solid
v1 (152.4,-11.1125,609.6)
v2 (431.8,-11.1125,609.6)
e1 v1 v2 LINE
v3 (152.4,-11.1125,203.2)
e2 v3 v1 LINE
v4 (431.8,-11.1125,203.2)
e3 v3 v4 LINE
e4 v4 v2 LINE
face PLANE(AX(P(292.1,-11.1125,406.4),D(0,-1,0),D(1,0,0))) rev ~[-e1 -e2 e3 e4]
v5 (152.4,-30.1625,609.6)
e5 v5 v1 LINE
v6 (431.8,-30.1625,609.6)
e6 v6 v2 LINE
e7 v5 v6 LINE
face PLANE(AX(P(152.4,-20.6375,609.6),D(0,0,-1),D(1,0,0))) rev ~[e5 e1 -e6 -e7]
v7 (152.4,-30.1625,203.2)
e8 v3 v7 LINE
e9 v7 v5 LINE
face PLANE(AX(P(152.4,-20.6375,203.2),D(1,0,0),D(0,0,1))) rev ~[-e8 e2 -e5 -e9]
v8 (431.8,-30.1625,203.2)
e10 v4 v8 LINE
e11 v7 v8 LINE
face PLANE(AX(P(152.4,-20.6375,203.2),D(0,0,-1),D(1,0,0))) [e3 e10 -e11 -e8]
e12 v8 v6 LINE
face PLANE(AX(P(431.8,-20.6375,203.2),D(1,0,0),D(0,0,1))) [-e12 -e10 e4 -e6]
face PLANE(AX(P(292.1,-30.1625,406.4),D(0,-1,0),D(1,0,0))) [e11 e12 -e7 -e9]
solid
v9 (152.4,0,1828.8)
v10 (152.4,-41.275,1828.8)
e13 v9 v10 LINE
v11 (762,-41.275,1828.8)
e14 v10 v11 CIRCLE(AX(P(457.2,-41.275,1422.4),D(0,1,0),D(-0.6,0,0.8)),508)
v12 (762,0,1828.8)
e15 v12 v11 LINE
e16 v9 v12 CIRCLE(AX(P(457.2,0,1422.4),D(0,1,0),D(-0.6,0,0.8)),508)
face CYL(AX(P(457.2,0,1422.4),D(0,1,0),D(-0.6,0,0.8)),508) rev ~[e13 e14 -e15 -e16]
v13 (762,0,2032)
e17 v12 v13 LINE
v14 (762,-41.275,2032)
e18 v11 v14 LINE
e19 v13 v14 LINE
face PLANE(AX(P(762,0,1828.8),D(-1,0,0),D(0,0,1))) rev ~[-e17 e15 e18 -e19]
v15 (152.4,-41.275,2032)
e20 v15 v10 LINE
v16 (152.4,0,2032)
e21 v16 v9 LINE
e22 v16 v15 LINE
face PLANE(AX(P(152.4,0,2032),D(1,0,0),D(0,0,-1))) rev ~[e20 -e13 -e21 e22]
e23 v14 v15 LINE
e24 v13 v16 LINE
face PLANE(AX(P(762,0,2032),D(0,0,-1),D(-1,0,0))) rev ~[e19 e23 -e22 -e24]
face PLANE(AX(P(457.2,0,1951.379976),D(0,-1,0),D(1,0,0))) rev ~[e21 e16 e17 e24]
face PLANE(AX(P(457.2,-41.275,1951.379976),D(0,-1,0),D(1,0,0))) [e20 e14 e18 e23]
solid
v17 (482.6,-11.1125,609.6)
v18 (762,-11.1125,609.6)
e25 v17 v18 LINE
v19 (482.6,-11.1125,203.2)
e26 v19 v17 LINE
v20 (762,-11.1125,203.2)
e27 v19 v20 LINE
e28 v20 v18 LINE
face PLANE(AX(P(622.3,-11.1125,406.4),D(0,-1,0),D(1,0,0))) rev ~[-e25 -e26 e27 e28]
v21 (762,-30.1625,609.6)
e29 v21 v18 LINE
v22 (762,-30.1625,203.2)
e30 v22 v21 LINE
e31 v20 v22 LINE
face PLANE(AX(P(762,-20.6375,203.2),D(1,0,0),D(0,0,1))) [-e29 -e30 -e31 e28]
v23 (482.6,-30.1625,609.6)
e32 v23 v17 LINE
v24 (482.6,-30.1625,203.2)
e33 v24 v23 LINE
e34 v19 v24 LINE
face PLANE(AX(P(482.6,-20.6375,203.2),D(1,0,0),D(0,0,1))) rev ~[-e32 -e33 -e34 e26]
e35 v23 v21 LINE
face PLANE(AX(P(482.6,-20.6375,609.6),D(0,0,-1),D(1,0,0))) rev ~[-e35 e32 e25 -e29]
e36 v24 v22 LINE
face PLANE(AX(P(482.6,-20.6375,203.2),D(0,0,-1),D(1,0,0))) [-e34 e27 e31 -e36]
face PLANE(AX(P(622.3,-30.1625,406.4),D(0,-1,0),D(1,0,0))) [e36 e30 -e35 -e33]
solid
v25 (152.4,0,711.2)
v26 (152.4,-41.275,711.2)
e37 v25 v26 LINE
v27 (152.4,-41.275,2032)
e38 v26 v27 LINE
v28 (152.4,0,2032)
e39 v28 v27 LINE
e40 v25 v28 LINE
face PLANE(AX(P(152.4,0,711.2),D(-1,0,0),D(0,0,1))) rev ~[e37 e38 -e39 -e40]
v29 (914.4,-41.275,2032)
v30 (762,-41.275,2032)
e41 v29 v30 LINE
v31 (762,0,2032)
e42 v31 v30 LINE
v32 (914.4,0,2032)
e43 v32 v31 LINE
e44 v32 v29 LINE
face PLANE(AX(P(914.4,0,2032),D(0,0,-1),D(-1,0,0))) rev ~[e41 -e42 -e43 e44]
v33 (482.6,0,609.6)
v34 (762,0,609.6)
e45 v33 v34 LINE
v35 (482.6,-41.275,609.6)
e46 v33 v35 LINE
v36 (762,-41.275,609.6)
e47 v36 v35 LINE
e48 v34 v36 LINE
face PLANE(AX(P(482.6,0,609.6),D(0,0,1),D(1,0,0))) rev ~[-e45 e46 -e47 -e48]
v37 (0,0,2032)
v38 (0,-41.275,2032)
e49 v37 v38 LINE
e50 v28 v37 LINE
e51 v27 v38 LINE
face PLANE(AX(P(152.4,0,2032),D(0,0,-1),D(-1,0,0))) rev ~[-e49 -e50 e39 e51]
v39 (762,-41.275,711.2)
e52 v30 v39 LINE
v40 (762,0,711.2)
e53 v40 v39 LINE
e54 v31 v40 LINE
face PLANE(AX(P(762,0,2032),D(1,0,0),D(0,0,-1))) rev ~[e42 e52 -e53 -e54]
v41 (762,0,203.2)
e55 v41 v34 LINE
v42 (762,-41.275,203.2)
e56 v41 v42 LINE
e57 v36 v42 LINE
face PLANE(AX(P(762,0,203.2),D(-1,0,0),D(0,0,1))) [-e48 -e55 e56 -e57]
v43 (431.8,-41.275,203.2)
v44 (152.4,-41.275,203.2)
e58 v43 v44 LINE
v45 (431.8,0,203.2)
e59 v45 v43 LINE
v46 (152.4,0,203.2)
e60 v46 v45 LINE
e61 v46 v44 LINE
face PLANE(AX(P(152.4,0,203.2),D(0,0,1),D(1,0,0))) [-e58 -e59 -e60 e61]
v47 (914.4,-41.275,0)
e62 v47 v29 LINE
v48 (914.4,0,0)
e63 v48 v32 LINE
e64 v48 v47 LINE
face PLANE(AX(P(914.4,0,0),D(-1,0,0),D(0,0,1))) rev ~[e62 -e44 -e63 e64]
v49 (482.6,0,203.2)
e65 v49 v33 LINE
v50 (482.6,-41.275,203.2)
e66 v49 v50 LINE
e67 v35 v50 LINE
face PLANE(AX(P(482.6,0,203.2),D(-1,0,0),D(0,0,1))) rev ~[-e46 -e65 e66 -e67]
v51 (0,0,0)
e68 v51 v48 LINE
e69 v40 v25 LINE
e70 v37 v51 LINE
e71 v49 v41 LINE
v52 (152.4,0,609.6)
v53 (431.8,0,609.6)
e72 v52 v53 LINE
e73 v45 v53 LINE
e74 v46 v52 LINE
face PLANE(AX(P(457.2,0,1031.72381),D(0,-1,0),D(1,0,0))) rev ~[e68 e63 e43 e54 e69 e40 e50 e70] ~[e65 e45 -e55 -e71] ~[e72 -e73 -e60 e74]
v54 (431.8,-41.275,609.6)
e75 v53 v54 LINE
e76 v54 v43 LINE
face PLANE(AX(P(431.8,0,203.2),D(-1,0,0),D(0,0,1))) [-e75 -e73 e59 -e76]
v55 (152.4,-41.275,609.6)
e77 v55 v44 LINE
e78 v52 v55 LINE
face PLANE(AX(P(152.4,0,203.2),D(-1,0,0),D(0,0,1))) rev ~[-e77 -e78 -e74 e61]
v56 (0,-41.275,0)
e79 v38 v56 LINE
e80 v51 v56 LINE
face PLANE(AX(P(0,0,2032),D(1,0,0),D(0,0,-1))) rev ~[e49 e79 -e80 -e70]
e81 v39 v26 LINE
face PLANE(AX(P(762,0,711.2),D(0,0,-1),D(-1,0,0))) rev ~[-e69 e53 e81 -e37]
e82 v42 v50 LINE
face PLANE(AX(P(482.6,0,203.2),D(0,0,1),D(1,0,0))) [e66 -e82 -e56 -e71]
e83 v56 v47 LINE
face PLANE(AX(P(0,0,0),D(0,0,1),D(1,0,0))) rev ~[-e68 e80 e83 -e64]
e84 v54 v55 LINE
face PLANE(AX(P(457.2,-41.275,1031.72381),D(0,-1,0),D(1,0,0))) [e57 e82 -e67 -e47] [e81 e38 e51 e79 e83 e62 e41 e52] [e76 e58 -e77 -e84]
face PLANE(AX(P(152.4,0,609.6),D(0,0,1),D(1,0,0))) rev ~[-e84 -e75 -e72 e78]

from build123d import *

# Parameters (mm, degrees)
F1_DEPTH = 41.275
F4_DEPTH = 41.275
F5_W     = 279.4
F5_H     = 406.4
F6_DEPTH = 41.276
F7_W     = 279.4
F7_H     = 406.4
F8_DEPTH = 9.525


# Not quite as in the source:
# - a length typed as a fraction of an inch, garbled in the dataset ("3 / 203.2 mm" for 3/8 in), is restored


with BuildPart() as f1:
    # F0 (on Front) → F1 (new body)
    with BuildSketch(Plane.XZ):
        Polygon((0, 2032), (0, 0), (914.4, 0), (914.4, 2032), (762, 2032), (762, 711.2), (152.4, 711.2), (152.4, 2032), align=None)
    extrude(amount=F1_DEPTH)

    # F5 (on Front) → F6 (cut, through all)
    with BuildSketch(Plane.XZ):
        with Locations((622.3, 406.4)):
            Rectangle(F5_W, F5_H)
        with Locations((292.1, 406.4)):
            Rectangle(F5_W, F5_H)
    extrude(amount=F6_DEPTH, mode=Mode.SUBTRACT)


with BuildPart() as f4:
    # F3 (on Front) → F4 (new body, through all)
    with BuildSketch(Plane.XZ):
        with BuildLine():
            Line((762, 2032), (152.4, 2032))
            Line((152.4, 2032), (152.4, 1828.8))
            ThreePointArc((152.4, 1828.8), (457.2, 1930.4), (762, 1828.8))
            Line((762, 1828.8), (762, 2032))
        make_face()
    extrude(amount=F4_DEPTH)


with BuildPart() as f8:
    # F7 (on offset) → F8 (new body, symmetric)
    with BuildSketch(Plane.XZ.offset(20.6375)):
        with Locations((292.1, 406.4)):
            Rectangle(F7_W, F7_H)
    extrude(amount=F8_DEPTH, both=True)


with BuildPart() as f8b:
    # F7 (on offset) → F8, piece 2 (new body, symmetric)
    with BuildSketch(Plane.XZ.offset(20.6375)):
        with Locations((622.3, 406.4)):
            Rectangle(F7_W, F7_H)
    extrude(amount=F8_DEPTH, both=True)


solid = Compound([f1.part, f4.part, f8.part, f8b.part])
